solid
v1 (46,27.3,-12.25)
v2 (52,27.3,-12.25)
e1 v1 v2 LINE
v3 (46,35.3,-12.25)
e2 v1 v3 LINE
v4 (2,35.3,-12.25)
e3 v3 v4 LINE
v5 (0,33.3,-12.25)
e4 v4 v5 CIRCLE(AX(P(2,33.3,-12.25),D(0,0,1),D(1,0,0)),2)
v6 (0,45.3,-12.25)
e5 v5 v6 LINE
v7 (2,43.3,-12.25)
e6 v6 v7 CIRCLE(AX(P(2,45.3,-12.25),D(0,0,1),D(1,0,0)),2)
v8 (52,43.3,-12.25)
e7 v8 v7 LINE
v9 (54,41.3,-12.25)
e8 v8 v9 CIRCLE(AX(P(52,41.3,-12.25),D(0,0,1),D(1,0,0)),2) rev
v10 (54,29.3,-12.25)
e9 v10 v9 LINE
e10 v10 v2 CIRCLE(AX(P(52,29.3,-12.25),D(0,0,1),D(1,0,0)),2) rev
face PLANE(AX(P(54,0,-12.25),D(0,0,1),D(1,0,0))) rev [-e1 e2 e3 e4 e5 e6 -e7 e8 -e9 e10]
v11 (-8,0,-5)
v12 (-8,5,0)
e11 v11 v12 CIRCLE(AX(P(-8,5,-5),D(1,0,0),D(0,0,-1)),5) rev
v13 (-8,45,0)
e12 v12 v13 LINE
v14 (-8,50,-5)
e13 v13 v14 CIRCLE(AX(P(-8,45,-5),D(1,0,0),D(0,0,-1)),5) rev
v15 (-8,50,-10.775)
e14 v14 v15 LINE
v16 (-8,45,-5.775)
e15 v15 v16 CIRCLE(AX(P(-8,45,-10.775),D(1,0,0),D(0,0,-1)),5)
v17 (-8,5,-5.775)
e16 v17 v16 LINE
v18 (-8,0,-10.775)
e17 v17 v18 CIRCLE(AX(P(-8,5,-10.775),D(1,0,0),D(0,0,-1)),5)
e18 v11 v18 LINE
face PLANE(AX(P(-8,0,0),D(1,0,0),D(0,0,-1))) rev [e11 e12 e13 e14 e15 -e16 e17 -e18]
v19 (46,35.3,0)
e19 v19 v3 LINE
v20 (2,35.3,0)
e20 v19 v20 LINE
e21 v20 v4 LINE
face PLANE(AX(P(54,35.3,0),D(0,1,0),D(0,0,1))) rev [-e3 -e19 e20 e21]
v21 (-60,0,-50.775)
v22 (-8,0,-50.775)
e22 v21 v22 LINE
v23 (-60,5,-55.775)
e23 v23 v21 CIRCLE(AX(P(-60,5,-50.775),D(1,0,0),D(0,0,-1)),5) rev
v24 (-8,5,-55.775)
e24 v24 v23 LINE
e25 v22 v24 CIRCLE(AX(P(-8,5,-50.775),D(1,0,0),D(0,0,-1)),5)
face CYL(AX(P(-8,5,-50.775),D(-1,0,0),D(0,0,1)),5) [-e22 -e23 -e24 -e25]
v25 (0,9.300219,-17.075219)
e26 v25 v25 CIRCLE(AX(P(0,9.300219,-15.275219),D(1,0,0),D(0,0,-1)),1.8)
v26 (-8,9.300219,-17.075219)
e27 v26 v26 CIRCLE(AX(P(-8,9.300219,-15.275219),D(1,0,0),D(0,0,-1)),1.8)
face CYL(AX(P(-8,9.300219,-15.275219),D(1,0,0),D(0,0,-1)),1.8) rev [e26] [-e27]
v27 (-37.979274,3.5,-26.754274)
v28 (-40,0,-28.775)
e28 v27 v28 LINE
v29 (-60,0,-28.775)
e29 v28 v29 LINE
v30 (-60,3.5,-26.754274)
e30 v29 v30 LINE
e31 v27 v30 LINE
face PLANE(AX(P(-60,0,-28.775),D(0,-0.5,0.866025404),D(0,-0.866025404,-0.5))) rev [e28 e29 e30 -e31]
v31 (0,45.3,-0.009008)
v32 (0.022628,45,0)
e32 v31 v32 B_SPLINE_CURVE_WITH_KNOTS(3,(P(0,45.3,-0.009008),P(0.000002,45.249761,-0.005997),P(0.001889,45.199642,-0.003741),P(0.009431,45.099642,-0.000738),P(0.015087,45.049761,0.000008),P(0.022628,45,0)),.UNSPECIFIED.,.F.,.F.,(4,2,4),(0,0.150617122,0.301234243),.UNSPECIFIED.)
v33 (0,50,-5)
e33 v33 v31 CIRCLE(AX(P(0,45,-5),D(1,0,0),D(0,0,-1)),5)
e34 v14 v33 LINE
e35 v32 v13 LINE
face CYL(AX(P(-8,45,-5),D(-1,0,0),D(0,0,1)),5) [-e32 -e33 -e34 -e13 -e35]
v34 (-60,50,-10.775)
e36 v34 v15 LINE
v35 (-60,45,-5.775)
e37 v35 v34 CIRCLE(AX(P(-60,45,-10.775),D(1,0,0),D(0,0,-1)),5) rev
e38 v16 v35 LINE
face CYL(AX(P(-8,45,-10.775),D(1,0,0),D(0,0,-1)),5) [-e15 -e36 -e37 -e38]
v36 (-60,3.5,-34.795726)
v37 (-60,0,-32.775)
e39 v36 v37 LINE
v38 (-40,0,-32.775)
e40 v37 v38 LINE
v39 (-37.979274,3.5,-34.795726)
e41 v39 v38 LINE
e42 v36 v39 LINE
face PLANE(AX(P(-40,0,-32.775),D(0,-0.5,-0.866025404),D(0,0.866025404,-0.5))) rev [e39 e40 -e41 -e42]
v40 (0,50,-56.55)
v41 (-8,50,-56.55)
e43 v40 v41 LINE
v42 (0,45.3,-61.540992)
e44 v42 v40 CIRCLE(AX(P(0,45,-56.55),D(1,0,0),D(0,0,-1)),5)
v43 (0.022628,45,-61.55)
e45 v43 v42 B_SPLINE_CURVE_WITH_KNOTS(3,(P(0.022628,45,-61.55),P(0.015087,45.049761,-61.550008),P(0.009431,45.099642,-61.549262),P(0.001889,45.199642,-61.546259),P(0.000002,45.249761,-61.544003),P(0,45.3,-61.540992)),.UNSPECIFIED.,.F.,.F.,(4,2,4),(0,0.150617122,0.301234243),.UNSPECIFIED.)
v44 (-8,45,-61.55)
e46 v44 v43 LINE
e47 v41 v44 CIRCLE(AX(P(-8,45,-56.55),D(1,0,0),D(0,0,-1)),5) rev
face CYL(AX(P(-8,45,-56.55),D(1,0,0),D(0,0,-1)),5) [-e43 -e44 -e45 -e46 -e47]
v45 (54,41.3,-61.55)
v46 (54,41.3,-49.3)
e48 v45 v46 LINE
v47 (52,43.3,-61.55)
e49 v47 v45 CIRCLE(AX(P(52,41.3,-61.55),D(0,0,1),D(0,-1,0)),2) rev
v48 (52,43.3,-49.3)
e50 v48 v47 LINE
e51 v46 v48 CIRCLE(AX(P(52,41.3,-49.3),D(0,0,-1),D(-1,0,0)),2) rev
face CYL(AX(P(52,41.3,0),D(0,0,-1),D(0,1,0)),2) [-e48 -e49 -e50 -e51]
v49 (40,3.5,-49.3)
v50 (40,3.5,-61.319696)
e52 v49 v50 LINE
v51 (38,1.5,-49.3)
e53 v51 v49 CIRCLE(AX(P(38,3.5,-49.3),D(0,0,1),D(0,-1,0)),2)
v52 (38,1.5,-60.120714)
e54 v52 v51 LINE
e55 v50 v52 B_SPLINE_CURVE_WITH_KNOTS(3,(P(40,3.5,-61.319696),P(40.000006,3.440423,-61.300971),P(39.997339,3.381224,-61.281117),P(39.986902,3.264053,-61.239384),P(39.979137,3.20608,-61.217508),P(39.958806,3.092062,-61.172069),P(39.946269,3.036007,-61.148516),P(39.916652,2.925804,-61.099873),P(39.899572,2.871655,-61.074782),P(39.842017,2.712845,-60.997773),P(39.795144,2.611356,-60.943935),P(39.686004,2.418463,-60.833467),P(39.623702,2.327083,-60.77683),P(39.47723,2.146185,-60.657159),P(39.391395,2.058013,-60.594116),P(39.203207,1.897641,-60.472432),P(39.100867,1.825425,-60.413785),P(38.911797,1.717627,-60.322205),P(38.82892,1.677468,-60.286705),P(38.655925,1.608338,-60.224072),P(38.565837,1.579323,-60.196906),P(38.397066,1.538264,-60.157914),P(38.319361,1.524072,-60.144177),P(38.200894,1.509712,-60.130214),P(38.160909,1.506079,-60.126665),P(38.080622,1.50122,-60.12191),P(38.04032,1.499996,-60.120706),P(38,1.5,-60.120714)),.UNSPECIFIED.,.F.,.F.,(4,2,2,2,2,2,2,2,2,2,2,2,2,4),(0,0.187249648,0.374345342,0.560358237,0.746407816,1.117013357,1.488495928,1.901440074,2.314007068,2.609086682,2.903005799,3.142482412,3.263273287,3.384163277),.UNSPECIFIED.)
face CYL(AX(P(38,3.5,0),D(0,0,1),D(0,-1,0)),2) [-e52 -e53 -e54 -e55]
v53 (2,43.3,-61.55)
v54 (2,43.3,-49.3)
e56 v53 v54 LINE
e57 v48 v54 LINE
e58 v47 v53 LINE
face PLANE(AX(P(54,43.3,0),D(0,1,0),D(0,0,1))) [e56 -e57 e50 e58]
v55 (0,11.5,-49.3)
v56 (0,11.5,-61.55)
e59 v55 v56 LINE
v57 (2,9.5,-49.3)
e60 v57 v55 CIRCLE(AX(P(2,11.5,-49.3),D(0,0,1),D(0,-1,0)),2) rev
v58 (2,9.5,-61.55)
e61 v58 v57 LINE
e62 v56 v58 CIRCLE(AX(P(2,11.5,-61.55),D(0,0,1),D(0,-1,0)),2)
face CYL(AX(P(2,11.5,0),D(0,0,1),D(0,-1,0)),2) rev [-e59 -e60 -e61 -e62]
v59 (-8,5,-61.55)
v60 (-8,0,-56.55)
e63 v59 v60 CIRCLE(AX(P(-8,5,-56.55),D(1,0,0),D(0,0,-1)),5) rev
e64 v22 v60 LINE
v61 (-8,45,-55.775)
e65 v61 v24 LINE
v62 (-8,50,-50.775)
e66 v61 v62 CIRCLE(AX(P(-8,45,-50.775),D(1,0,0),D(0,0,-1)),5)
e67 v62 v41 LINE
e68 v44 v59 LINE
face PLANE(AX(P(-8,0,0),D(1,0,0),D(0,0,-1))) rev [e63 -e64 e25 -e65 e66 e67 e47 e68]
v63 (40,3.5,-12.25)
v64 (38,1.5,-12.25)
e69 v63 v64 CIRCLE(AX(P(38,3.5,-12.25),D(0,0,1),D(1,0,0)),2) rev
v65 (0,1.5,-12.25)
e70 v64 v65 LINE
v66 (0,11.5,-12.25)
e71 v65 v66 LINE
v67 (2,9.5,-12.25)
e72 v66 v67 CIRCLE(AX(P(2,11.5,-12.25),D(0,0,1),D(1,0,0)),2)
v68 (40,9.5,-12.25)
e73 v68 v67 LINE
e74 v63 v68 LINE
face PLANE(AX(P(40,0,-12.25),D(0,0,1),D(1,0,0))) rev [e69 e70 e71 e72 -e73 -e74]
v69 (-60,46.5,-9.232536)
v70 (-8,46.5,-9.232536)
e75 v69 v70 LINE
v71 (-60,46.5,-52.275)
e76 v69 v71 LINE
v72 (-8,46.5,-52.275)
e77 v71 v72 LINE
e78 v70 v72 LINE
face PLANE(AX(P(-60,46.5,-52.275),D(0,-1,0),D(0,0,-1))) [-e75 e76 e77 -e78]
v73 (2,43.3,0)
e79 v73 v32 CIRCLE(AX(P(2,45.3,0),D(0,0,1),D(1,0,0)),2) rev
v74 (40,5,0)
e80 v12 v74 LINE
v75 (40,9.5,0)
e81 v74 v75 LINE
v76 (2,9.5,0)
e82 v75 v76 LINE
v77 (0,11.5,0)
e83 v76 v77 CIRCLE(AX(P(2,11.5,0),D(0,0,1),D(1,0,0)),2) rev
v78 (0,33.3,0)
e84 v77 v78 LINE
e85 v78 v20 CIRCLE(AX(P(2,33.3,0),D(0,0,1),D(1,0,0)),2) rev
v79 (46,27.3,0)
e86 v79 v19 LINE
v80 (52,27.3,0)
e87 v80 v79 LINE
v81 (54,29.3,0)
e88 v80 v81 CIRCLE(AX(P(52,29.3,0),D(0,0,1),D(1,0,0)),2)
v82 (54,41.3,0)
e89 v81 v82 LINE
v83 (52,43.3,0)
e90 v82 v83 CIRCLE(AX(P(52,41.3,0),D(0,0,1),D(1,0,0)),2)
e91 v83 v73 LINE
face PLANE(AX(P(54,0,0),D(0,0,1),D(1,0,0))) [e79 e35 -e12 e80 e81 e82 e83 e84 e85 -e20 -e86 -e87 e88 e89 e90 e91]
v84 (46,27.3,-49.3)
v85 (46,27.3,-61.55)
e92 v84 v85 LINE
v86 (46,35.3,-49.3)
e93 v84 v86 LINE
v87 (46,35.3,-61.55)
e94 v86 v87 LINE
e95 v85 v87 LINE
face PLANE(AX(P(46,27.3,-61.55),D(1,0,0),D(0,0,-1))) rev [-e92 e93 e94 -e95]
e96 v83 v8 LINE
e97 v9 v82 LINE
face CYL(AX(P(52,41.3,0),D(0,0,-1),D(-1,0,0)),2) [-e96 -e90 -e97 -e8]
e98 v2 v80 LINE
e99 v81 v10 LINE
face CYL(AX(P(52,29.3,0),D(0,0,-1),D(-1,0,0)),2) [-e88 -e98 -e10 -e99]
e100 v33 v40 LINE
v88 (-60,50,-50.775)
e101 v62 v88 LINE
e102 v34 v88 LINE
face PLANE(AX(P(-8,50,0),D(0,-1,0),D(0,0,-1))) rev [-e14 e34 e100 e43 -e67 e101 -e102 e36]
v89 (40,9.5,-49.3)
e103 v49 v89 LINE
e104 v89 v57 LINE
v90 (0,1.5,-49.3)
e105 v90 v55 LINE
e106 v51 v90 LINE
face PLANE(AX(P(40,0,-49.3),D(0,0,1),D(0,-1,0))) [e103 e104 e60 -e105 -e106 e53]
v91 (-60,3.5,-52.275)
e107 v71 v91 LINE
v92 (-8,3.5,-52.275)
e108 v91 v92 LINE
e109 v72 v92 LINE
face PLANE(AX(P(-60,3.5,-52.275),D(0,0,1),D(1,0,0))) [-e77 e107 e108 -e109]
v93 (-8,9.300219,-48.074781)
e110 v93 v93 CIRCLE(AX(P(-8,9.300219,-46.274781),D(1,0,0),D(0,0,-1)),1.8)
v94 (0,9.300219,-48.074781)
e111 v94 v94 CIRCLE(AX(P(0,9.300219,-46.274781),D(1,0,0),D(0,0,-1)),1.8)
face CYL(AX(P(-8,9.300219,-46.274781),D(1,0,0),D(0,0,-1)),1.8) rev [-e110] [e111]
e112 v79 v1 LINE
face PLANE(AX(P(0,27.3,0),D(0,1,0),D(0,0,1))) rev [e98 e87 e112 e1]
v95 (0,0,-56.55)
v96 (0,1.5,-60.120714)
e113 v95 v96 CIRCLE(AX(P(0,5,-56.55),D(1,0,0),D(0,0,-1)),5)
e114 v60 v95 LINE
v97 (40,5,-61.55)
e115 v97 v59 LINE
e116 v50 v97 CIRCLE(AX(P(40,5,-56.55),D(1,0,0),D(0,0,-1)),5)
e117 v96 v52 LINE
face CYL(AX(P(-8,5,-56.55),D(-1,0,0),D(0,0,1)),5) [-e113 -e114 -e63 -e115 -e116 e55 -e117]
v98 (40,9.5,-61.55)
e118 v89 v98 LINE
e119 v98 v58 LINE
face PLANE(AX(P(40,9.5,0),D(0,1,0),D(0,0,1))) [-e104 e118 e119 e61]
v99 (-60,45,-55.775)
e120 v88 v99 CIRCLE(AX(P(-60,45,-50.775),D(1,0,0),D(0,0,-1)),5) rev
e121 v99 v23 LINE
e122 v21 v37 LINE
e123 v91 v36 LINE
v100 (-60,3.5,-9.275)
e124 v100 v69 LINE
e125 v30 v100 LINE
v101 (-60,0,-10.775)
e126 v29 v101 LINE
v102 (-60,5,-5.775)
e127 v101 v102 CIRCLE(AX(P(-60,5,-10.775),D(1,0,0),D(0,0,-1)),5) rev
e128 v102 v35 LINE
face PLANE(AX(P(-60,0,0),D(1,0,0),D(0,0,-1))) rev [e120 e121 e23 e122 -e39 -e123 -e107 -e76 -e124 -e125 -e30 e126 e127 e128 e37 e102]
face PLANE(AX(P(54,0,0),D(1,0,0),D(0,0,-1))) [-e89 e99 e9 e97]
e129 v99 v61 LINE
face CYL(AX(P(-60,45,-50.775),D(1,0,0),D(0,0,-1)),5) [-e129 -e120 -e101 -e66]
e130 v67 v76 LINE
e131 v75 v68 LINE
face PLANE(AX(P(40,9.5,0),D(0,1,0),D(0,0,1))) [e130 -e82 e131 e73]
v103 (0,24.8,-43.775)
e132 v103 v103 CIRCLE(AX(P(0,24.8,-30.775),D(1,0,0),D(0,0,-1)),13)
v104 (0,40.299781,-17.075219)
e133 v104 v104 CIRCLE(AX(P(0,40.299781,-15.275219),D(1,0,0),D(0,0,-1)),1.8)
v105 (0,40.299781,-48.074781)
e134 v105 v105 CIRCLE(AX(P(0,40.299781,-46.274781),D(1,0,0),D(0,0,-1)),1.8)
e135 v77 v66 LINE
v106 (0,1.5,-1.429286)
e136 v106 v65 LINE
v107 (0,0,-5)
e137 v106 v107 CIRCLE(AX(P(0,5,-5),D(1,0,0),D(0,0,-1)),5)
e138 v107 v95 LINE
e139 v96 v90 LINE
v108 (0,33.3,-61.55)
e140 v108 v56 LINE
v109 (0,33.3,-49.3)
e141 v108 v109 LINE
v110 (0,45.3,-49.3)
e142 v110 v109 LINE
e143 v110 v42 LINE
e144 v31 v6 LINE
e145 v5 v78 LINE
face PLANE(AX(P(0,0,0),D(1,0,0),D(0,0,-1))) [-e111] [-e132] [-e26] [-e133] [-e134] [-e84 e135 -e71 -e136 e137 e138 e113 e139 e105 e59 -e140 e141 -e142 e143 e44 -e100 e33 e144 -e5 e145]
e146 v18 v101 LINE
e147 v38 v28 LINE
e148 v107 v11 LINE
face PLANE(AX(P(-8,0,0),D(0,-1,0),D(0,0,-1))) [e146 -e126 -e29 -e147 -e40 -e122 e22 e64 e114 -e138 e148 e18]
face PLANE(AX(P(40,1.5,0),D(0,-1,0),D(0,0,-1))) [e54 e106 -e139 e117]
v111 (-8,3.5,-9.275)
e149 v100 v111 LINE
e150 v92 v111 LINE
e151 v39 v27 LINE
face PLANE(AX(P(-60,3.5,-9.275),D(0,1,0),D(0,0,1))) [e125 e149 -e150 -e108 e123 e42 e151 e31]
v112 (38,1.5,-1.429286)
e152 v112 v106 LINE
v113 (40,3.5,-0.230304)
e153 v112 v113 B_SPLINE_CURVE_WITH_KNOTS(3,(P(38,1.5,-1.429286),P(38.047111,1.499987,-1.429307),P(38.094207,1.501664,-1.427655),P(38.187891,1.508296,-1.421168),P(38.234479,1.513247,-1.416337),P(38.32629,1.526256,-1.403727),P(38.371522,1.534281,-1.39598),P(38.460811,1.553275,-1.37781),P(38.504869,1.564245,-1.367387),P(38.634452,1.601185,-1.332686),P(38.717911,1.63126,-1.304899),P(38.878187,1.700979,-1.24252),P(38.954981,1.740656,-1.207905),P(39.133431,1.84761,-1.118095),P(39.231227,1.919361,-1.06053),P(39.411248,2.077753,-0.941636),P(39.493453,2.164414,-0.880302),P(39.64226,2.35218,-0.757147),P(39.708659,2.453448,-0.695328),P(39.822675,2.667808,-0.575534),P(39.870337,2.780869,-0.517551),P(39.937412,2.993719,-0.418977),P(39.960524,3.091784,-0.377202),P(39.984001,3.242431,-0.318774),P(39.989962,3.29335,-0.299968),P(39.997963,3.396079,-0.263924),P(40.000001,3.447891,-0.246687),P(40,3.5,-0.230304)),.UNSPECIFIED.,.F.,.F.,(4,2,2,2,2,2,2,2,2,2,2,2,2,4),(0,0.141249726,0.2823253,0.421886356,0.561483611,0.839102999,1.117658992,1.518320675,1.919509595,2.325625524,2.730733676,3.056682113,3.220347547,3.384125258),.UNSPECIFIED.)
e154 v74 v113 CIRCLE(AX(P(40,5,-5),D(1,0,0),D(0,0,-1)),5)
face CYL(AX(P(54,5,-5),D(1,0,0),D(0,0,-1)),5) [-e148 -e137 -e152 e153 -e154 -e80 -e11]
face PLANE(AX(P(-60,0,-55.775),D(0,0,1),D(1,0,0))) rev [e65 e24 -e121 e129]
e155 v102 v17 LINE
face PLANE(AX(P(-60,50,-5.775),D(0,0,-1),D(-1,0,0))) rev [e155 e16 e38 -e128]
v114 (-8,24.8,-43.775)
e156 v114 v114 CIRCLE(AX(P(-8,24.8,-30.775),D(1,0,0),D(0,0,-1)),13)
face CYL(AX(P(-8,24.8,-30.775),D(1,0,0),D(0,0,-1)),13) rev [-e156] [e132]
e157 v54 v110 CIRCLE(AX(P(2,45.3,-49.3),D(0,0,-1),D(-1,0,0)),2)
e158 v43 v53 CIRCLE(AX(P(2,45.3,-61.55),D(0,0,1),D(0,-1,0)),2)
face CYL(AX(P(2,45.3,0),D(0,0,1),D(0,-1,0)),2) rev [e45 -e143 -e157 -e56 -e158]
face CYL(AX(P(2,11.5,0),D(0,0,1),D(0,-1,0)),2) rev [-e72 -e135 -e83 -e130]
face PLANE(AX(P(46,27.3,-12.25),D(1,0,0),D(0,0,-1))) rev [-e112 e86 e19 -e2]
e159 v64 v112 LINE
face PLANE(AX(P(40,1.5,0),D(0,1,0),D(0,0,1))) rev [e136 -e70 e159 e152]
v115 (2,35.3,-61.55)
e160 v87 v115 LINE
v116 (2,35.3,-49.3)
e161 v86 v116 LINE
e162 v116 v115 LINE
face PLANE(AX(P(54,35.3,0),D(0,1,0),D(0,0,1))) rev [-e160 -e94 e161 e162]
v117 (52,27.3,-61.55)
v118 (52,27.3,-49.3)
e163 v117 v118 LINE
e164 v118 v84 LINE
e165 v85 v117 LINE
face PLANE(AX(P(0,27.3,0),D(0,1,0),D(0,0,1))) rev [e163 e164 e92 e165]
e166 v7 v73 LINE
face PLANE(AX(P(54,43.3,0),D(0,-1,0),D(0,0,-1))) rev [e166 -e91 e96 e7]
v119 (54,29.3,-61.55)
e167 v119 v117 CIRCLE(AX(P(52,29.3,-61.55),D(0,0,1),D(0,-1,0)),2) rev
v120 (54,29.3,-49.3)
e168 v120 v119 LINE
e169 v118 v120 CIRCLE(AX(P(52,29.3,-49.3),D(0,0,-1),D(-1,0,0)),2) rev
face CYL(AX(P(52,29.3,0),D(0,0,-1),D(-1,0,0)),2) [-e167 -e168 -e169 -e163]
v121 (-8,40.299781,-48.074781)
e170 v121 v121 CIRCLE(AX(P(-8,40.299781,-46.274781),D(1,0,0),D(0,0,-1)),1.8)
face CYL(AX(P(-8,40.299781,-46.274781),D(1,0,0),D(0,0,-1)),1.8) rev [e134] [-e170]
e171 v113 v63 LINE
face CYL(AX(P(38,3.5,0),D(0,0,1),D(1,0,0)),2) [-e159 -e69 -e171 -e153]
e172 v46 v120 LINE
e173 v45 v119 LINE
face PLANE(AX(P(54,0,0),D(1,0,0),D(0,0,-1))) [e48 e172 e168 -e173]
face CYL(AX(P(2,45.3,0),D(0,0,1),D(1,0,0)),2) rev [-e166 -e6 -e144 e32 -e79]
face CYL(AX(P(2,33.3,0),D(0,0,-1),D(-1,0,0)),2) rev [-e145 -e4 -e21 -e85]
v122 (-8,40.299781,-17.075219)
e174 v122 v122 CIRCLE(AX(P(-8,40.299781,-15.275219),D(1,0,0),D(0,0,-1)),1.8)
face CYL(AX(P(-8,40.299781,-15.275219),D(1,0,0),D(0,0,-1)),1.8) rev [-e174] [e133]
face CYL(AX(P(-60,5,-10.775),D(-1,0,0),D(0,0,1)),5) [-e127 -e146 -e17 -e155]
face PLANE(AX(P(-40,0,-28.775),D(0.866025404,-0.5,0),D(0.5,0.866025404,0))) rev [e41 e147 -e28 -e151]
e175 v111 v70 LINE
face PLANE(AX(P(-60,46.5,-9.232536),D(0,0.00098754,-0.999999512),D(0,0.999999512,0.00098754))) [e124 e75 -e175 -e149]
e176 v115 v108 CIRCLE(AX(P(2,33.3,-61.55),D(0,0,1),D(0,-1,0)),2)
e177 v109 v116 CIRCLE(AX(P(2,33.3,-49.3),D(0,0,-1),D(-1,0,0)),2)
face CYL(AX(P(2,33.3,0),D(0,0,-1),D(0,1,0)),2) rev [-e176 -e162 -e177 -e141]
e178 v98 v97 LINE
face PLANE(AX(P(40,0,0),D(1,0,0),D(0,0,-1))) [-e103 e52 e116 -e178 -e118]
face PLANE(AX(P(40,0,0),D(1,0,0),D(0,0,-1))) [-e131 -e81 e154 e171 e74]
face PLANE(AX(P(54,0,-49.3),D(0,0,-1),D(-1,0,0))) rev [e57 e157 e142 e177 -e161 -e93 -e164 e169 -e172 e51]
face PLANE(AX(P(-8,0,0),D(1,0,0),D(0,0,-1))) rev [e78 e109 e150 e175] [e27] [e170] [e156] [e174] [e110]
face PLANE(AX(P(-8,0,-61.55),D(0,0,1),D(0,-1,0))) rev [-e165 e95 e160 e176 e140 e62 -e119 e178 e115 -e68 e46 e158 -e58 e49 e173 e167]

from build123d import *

# Parameters (mm, degrees)
SKETCH1_W                 = 12.25
SKETCH1_H                 = 8
BOSS_EXTRUDE1_DEPTH       = 54
BOSS_EXTRUDE1_2_DEPTH     = 54
SKETCH1_7_W               = 12.25
SKETCH1_7_H               = 8
BOSS_EXTRUDE7_DEPTH       = 40
BOSS_EXTRUDE7_2_DEPTH     = 40
BOSS_EXTRUDE2_START       = -8
BOSS_EXTRUDE2_OUTLINE_W   = 61.55
BOSS_EXTRUDE2_OUTLINE_H   = 50
BOSS_EXTRUDE2_OUTLINE_R   = 1.8
BOSS_EXTRUDE2_OUTLINE_R_2 = 13
BOSS_EXTRUDE2_DEPTH       = 8
FILLET1_R                 = 2
SKETCH2_W                 = 8
SKETCH2_H                 = 12.25
BOSS_EXTRUDE3_DEPTH       = 8
FILLET2_R                 = 5
FILLET3_R                 = 2
SKETCH3_W                 = 50
SKETCH3_H                 = 50
BOSS_EXTRUDE4_DEPTH       = 52
FILLET7_R                 = 5
SKETCH4_W                 = 20
SKETCH4_H                 = 4
CUT_EXTRUDE1_DEPTH        = 3.5
CUT_EXTRUDE1_TAPER        = -30


# Read off the part's stored shape, not the designer's step: Boss-Extrude2
with BuildPart() as part:
    # Sketch1 → Boss-Extrude1 (new body)
    with BuildSketch(Plane(origin=(0, 0, 0), x_dir=(0, 0, -1), z_dir=(1, 0, 0))):
        with Locations((6.125, 39.3)):
            Rectangle(SKETCH1_W, SKETCH1_H)
    extrude(amount=BOSS_EXTRUDE1_DEPTH)



with BuildPart() as body_2:
    # Sketch1 → Boss-Extrude1 2 (new body)
    with BuildSketch(Plane(origin=(0, 0, 0), x_dir=(0, 0, -1), z_dir=(1, 0, 0))):
        with Locations((55.425, 39.3)):
            Rectangle(SKETCH1_W, SKETCH1_H)
    extrude(amount=BOSS_EXTRUDE1_2_DEPTH)


with BuildPart() as body_3:
    # Sketch1<7> → Boss-Extrude7 (new body)
    with BuildSketch(Plane(origin=(0, 0, 0), x_dir=(0, 0, -1), z_dir=(1, 0, 0))):
        with Locations((6.125, 5.5)):
            Rectangle(SKETCH1_7_W, SKETCH1_7_H)
    extrude(amount=BOSS_EXTRUDE7_DEPTH)


with BuildPart() as body_4:
    # Sketch1<7> → Boss-Extrude7 2 (new body)
    with BuildSketch(Plane(origin=(0, 0, 0), x_dir=(0, 0, -1), z_dir=(1, 0, 0))):
        with Locations((55.425, 5.5)):
            Rectangle(SKETCH1_7_W, SKETCH1_7_H)
    extrude(amount=BOSS_EXTRUDE7_2_DEPTH)


with BuildPart() as part_1:
    add(part.part)

    add(body_2.part)  # Boss-Extrude2 merges body 2

    add(body_3.part)  # Boss-Extrude2 merges body 3

    add(body_4.part)  # Boss-Extrude2 merges body 4
    # Boss-Extrude2 outline → Boss-Extrude2 (add)
    with BuildSketch(Plane(origin=(0, 0, 0), x_dir=(0, 0, -1), z_dir=(1, 0, 0)).offset(BOSS_EXTRUDE2_START)):
        with Locations((30.775, 25)):
            Rectangle(BOSS_EXTRUDE2_OUTLINE_W, BOSS_EXTRUDE2_OUTLINE_H)
        with Locations((15.275219356, 9.300219356)):
            Circle(BOSS_EXTRUDE2_OUTLINE_R, mode=Mode.SUBTRACT)
        with Locations((46.274780644, 9.300219356)):
            Circle(BOSS_EXTRUDE2_OUTLINE_R, mode=Mode.SUBTRACT)
        with Locations((30.775, 24.8)):
            Circle(BOSS_EXTRUDE2_OUTLINE_R_2, mode=Mode.SUBTRACT)
        with Locations((15.275219356, 40.299780644)):
            Circle(BOSS_EXTRUDE2_OUTLINE_R, mode=Mode.SUBTRACT)
        with Locations((46.274780644, 40.299780644)):
            Circle(BOSS_EXTRUDE2_OUTLINE_R, mode=Mode.SUBTRACT)
    extrude(amount=BOSS_EXTRUDE2_DEPTH)

    # Fillet1
    fillet1_edges = [part_1.edges().sort_by_distance(p)[0] for p in [
        (0, 35.3, -55.425),
        (0, 43.3, -55.425),
        (0, 35.3, -6.125),
        (0, 9.5, -6.125),
        (0, 43.3, -6.125),
        (0, 9.5, -55.425),
    ]]
    fillet(fillet1_edges, radius=FILLET1_R)

    # Sketch2 → Boss-Extrude3 (add)
    with BuildSketch(Plane.XZ.offset(-35.3)):
        with Locations((50, -6.125)):
            Rectangle(SKETCH2_W, SKETCH2_H)
        with Locations((50, -55.425)):
            Rectangle(SKETCH2_W, SKETCH2_H)
    extrude(amount=BOSS_EXTRUDE3_DEPTH)

    # Fillet2
    fillet2_edges = [part_1.edges().sort_by_distance(p)[0] for p in [
        (-4, 50, -61.55),
        (-4, 0, -61.55),
        (-4, 0, 0),
        (-4, 50, 0),
    ]]
    fillet(fillet2_edges, radius=FILLET2_R)

    # Fillet3
    fillet3_edges = [part_1.edges().sort_by_distance(p)[0] for p in [
        (54, 43.3, -6.125),
        (54, 27.3, -6.125),
        (54, 27.3, -55.425),
        (40, 1.5, -54.710357107),
        (40, 1.5, -6.839642893),
        (54, 43.3, -55.425),
    ]]
    fillet(fillet3_edges, radius=FILLET3_R)

    # Sketch3 → Boss-Extrude4 (add)
    with BuildSketch(Plane.ZY.offset(8)):
        with Locations((-30.775, 25)):
            Rectangle(SKETCH3_W, SKETCH3_H)
        Polygon((-52.275, 46.5), (-9.232535772, 46.5), (-9.275, 3.5), (-52.275, 3.5), align=None, mode=Mode.SUBTRACT)
    extrude(amount=BOSS_EXTRUDE4_DEPTH)

    # Fillet7
    fillet7_edges = [part_1.edges().sort_by_distance(p)[0] for p in [
        (-34, 50, -55.775),
        (-34, 0, -55.775),
        (-34, 0, -5.775),
        (-34, 50, -5.775),
    ]]
    fillet(fillet7_edges, radius=FILLET7_R)

    # Sketch4 → Cut-Extrude1 (cut)
    with BuildSketch(Plane.XZ):
        with Locations((-50, -30.775)):
            Rectangle(SKETCH4_W, SKETCH4_H)
    extrude(amount=-CUT_EXTRUDE1_DEPTH, taper=CUT_EXTRUDE1_TAPER, mode=Mode.SUBTRACT)


solid = part_1.part
